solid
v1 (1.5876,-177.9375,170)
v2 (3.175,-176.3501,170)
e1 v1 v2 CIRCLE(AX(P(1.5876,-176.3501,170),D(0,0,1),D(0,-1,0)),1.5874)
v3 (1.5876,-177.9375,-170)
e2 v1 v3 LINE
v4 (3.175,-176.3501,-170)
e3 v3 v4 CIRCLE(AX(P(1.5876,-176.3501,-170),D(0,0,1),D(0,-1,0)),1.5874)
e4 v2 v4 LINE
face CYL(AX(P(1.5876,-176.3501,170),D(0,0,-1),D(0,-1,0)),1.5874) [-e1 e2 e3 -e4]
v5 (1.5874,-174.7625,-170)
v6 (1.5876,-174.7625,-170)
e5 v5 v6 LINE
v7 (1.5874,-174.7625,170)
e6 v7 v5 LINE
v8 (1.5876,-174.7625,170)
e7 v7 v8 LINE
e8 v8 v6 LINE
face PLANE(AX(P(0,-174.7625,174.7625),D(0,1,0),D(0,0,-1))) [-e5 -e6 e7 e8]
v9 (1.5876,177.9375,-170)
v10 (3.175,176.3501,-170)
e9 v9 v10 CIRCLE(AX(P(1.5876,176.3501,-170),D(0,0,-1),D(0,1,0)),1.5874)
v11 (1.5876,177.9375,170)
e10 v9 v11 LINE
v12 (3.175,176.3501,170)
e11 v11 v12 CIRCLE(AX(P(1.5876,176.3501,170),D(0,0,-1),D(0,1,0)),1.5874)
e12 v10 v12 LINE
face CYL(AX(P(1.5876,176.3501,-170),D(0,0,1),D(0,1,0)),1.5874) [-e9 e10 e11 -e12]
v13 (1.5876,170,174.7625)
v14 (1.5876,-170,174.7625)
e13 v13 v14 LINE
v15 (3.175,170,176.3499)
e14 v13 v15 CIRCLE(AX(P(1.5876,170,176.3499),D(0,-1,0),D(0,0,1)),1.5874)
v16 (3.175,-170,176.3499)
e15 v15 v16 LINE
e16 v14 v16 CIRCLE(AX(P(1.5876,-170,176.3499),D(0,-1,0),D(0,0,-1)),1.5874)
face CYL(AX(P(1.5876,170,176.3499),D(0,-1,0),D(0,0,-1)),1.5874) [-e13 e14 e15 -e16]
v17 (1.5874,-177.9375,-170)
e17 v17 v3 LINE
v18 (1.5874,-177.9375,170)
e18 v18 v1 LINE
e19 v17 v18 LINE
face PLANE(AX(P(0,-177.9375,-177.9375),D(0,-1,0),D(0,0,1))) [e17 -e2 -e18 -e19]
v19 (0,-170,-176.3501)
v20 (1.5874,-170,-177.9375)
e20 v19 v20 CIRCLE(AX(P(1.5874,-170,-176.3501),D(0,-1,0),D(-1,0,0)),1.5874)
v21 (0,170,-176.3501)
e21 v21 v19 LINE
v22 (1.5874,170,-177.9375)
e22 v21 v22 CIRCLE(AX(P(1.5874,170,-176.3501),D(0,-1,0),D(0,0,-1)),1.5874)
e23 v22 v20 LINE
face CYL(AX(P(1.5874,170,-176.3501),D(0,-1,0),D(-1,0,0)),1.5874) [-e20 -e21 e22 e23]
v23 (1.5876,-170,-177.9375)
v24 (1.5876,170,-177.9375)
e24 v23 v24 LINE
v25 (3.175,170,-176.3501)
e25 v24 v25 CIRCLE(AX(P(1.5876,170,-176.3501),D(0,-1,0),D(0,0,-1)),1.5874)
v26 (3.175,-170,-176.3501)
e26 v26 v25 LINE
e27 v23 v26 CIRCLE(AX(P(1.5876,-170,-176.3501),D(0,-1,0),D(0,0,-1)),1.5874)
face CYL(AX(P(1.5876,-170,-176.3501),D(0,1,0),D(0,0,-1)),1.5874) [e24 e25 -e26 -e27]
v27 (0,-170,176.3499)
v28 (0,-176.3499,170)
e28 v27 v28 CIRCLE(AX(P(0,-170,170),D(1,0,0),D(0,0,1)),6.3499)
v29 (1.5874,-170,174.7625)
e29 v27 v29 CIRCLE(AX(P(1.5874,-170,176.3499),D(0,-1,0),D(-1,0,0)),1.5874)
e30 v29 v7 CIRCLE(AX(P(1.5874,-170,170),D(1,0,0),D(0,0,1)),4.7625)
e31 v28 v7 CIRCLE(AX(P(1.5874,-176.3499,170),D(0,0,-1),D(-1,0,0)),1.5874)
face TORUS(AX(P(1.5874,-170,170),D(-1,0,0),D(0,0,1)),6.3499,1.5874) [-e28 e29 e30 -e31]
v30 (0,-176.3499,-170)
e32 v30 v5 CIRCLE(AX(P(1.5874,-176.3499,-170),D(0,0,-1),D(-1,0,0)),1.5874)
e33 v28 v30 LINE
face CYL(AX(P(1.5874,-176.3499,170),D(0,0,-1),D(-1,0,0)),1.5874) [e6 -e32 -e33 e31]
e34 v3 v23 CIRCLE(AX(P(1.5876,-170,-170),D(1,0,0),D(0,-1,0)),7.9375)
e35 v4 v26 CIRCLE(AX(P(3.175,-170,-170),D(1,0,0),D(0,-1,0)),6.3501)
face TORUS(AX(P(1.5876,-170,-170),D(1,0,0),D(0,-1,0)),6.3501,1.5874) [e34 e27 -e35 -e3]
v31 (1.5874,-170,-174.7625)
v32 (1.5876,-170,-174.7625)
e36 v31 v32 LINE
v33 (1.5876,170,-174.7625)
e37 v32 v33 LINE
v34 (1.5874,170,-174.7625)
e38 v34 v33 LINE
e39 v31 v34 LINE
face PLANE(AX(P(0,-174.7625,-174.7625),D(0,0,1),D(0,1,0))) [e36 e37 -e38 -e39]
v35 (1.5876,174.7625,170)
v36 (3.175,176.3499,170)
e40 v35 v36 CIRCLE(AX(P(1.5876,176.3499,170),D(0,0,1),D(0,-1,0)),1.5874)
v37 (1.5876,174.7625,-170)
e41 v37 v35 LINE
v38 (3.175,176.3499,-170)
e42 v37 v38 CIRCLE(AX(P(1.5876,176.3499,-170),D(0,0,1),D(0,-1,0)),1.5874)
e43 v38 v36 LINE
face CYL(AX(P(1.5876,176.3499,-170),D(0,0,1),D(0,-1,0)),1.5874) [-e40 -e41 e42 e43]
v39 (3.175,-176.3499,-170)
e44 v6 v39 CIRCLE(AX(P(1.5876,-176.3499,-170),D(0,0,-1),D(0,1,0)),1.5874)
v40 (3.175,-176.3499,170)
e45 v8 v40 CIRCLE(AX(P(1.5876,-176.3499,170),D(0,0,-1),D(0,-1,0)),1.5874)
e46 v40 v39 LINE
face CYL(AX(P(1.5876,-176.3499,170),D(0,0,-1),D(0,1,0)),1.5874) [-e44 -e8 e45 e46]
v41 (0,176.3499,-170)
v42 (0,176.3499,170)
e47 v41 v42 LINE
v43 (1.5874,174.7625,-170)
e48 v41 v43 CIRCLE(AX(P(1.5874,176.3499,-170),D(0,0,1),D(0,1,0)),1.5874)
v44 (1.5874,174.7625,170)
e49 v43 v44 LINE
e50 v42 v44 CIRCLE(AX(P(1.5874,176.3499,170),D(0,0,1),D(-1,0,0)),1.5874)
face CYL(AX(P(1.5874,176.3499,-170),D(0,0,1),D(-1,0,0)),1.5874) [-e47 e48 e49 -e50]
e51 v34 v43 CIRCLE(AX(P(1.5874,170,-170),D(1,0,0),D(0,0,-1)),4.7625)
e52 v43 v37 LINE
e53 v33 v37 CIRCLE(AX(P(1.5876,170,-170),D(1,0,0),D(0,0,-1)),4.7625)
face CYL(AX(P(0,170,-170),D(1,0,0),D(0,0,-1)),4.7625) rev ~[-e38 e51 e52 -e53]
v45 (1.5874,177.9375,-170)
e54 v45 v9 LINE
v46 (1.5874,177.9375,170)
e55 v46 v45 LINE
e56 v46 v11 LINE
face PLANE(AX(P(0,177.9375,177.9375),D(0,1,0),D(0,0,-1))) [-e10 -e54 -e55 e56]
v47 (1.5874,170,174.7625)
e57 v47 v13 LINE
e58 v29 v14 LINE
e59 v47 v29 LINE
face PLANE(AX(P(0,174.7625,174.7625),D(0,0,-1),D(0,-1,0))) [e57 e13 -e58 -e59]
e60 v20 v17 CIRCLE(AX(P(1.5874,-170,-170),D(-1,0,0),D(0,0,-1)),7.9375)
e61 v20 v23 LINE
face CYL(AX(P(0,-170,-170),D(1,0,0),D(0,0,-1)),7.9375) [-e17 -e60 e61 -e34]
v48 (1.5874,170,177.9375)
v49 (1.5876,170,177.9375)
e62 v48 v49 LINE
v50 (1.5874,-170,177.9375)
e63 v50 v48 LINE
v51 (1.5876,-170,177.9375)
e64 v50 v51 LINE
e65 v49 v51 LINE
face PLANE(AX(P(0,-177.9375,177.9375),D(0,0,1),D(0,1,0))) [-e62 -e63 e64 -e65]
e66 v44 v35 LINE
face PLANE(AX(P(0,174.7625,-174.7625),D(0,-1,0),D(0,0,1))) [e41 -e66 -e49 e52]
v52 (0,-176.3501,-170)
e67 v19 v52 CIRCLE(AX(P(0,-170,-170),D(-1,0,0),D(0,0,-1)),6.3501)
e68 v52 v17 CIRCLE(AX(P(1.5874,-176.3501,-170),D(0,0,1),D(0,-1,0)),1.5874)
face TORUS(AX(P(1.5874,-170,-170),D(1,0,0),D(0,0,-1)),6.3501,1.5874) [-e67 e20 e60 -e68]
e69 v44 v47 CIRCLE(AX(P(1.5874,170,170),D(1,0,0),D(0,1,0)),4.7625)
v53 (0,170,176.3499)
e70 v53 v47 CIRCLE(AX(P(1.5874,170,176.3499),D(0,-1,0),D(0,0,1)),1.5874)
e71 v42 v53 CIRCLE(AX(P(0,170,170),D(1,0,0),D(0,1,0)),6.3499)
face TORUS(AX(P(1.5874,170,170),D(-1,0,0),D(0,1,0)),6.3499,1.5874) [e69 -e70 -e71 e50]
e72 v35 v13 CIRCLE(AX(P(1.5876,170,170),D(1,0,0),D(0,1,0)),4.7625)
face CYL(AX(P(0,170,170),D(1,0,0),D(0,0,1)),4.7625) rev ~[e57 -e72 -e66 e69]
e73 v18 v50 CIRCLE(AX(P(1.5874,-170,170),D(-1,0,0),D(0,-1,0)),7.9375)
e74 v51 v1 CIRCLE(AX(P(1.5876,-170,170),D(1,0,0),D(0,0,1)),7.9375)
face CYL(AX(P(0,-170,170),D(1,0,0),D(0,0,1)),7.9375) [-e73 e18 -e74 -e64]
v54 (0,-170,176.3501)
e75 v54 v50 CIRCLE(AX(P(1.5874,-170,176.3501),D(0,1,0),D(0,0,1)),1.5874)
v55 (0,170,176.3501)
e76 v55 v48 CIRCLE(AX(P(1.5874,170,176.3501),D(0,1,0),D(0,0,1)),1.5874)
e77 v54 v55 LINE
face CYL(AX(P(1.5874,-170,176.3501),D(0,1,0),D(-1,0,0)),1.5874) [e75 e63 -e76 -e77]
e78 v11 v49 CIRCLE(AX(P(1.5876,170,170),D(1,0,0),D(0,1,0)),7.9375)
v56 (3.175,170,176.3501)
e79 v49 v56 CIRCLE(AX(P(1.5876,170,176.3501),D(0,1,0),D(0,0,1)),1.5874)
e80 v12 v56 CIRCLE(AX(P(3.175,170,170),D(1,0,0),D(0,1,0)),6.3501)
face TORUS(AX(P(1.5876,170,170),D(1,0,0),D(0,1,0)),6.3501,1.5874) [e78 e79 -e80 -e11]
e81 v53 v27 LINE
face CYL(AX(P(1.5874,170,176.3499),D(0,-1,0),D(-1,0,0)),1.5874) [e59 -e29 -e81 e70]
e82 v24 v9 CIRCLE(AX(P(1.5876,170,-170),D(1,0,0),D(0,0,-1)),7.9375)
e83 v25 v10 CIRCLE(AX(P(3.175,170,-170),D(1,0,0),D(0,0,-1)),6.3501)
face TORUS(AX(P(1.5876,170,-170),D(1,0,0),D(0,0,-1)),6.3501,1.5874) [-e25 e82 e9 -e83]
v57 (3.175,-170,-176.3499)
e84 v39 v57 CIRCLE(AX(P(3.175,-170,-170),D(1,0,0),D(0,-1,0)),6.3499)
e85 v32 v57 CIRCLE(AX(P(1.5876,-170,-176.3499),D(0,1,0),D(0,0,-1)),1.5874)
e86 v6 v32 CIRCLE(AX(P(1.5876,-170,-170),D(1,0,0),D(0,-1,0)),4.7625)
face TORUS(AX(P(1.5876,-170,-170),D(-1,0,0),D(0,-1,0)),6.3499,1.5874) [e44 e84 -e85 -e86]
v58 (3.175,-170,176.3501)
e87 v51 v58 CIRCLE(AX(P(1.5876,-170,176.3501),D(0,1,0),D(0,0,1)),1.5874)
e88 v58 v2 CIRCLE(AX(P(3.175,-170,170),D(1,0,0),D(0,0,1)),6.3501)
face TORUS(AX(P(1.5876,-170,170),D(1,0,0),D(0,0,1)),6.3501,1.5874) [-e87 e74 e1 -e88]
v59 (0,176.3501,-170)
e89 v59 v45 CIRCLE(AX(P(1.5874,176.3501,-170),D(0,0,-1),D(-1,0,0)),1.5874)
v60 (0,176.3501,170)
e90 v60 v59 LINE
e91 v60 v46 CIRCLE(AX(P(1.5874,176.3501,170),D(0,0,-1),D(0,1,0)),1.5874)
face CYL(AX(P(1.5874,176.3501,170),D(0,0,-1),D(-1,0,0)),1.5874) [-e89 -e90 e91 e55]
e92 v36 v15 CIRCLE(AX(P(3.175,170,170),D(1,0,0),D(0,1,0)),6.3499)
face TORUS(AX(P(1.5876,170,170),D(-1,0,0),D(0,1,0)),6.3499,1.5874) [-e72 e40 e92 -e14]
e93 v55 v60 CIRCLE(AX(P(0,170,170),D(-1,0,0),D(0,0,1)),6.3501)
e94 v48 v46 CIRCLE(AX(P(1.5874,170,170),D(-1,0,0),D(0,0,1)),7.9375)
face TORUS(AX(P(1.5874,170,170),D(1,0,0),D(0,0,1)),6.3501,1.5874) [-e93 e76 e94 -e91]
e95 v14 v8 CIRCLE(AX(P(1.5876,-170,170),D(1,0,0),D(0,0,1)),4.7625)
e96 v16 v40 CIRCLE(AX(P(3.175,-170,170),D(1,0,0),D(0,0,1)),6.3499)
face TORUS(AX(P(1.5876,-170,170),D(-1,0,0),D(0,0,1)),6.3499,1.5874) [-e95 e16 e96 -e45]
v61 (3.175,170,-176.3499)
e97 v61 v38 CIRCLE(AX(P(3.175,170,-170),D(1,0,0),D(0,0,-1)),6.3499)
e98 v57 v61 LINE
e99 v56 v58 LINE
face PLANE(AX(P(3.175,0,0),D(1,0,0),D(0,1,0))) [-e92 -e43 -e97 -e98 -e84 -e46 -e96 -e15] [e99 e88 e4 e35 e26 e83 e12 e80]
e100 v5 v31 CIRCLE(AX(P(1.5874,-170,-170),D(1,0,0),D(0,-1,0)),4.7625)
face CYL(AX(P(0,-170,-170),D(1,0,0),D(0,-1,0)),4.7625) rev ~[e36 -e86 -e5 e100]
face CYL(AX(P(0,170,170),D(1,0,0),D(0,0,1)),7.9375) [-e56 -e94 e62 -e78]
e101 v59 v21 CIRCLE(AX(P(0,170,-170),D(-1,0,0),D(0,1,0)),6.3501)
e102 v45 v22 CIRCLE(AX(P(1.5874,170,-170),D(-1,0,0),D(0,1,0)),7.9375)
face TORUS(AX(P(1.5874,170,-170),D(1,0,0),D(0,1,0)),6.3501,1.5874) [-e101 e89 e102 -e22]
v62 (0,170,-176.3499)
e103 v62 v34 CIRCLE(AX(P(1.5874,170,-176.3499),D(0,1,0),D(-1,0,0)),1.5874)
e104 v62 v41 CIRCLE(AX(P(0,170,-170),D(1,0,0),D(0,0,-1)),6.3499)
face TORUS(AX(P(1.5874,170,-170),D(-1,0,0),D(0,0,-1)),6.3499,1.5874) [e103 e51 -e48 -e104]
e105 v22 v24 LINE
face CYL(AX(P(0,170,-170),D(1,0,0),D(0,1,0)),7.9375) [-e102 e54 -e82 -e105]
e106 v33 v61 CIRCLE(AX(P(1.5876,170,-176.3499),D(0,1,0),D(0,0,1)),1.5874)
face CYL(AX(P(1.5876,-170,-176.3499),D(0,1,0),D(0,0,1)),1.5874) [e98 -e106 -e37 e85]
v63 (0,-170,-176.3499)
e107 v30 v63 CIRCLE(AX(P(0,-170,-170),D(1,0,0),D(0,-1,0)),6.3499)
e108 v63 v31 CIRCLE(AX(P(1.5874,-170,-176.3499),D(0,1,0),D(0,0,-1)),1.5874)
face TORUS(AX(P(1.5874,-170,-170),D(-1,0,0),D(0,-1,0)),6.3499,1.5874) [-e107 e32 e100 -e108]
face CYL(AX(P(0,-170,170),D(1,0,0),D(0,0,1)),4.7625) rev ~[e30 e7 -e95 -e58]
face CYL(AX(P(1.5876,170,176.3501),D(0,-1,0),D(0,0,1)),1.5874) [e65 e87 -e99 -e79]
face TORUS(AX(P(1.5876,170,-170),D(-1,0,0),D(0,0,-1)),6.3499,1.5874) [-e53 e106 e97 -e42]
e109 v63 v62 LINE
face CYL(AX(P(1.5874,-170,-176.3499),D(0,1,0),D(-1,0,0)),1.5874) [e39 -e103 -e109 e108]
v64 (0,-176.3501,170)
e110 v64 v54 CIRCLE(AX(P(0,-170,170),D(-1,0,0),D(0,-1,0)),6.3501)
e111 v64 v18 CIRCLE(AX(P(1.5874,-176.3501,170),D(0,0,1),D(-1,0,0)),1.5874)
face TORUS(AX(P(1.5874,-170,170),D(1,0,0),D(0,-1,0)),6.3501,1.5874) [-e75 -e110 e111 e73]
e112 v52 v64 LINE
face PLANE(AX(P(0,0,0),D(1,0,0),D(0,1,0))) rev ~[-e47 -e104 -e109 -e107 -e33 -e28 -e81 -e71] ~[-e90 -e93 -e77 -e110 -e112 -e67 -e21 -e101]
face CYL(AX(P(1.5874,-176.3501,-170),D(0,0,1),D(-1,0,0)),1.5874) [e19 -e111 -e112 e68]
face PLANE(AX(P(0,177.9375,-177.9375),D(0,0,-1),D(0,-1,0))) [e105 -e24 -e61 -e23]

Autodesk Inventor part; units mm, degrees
ref_plane "YZ Plane" through (0, 0, 0) normal (1, 0, 0) x (0, 1, 0)
ref_plane "XZ Plane" through (0, 0, 0) normal (0, 1, 0) x (-1, 0, 0)
ref_plane "XY Plane" through (0, 0, 0) normal (0, 0, 1) x (1, 0, 0)
sketch "Sketch1" plane through (0, 0, 0) normal (1, 0, 0) x (0, 1, 0)
  line L0 (-150, -150) -> (150, -150) construction
  line L1 (150, -150) -> (150, 150) construction
  line L2 (150, 150) -> (-150, 150) construction
  line L3 (-150, 150) -> (-150, -150) construction
  line L4 (-150, -150) -> (150, 150) construction
  line L5 (150, -150) -> (-150, 150) construction
  line L6 (-170, 170) -> (170, 170) construction
  line L7 (170, 170) -> (170, -170) construction
  line L8 (170, -170) -> (-170, -170) construction
  line L9 (-170, -170) -> (-170, 170) construction
  line L10 (174.7625, 174.7625) -> (-174.7625, 174.7625)
  line L11 (-174.7625, 174.7625) -> (-174.7625, -174.7625)
  line L12 (-174.7625, -174.7625) -> (174.7625, -174.7625)
  line L13 (174.7625, -174.7625) -> (174.7625, 174.7625)
  line L14 (-177.9375, 177.9375) -> (177.9375, 177.9375)
  line L15 (177.9375, 177.9375) -> (177.9375, -177.9375)
  line L16 (177.9375, -177.9375) -> (-177.9375, -177.9375)
  line L17 (-177.9375, -177.9375) -> (-177.9375, 177.9375)
  point P0 (0, 0)
  dimension "d0" = 300
  dimension "d1" = 300
  dimension "d2" = 20
  dimension "d3" = 4.7625
  dimension "d4" = 3.175
extrude "Extrusion1" add sketch "Sketch1" along normal blind 3.175
fillet "Fillet1" radius 7.9375 4 edges at (1.5875, 177.9375, 177.9375) (1.5875, -177.9375, 177.9375) (1.5875, -177.9375, -177.9375) (1.5875, 177.9375, -177.9375)
fillet "Fillet3" radius 4.7625 4 edges at (1.5875, 174.7625, -174.7625) (1.5875, -174.7625, 174.7625) (1.5875, 174.7625, 174.7625) (1.5875, -174.7625, -174.7625)
fillet "Fillet2" radius 1.5875 24 edges at (3.175, -175.6127, 175.6127) (3.175, -177.9375, 0) (3.175, -175.6127, -175.6127) (3.175, 0, -177.9375) (3.175, 175.6127, -175.6127) (3.175, 177.9375, 0) (3.175, 175.6127, 175.6127) (3.175, 0, 177.9375) (0, 175.6127, 175.6127) (0, 177.9375, 0) (0, 175.6127, -175.6127) (0, 0, -177.9375) (0, -175.6127, -175.6127) (0, -177.9375, 0) (0, -175.6127, 175.6127) (0, 0, 177.9375) (3.175, 174.7625, 0) (3.175, 0, -174.7625) (3.175, -174.7625, 0) (3.175, 0, 174.7625) (0, -174.7625, 0) (0, 0, -174.7625) (0, 174.7625, 0) (0, 0, 174.7625)
equation "\"d0\" = width"
equation "\"d1\" = height"
equation "\"d3\" = 0.375 * facingThickness"
equation "\"d4\" = 0.25 * facingThickness"
equation "\"d5\" = 0.25 * facingThickness"
equation "\"d7\" = 0.625 * facingThickness"
equation "\"d9\" = 0.375 * facingThickness"
equation "\"d8\" = 0.125 * facingThickness"
equation "\"width\" = 300"
equation "\"height\" = 300"
equation "\"facingThickness\" = 12.7"
equation "\"facingGasketThickness\" = 1.5875"
properties part number "matingORing" material "Rubber"
